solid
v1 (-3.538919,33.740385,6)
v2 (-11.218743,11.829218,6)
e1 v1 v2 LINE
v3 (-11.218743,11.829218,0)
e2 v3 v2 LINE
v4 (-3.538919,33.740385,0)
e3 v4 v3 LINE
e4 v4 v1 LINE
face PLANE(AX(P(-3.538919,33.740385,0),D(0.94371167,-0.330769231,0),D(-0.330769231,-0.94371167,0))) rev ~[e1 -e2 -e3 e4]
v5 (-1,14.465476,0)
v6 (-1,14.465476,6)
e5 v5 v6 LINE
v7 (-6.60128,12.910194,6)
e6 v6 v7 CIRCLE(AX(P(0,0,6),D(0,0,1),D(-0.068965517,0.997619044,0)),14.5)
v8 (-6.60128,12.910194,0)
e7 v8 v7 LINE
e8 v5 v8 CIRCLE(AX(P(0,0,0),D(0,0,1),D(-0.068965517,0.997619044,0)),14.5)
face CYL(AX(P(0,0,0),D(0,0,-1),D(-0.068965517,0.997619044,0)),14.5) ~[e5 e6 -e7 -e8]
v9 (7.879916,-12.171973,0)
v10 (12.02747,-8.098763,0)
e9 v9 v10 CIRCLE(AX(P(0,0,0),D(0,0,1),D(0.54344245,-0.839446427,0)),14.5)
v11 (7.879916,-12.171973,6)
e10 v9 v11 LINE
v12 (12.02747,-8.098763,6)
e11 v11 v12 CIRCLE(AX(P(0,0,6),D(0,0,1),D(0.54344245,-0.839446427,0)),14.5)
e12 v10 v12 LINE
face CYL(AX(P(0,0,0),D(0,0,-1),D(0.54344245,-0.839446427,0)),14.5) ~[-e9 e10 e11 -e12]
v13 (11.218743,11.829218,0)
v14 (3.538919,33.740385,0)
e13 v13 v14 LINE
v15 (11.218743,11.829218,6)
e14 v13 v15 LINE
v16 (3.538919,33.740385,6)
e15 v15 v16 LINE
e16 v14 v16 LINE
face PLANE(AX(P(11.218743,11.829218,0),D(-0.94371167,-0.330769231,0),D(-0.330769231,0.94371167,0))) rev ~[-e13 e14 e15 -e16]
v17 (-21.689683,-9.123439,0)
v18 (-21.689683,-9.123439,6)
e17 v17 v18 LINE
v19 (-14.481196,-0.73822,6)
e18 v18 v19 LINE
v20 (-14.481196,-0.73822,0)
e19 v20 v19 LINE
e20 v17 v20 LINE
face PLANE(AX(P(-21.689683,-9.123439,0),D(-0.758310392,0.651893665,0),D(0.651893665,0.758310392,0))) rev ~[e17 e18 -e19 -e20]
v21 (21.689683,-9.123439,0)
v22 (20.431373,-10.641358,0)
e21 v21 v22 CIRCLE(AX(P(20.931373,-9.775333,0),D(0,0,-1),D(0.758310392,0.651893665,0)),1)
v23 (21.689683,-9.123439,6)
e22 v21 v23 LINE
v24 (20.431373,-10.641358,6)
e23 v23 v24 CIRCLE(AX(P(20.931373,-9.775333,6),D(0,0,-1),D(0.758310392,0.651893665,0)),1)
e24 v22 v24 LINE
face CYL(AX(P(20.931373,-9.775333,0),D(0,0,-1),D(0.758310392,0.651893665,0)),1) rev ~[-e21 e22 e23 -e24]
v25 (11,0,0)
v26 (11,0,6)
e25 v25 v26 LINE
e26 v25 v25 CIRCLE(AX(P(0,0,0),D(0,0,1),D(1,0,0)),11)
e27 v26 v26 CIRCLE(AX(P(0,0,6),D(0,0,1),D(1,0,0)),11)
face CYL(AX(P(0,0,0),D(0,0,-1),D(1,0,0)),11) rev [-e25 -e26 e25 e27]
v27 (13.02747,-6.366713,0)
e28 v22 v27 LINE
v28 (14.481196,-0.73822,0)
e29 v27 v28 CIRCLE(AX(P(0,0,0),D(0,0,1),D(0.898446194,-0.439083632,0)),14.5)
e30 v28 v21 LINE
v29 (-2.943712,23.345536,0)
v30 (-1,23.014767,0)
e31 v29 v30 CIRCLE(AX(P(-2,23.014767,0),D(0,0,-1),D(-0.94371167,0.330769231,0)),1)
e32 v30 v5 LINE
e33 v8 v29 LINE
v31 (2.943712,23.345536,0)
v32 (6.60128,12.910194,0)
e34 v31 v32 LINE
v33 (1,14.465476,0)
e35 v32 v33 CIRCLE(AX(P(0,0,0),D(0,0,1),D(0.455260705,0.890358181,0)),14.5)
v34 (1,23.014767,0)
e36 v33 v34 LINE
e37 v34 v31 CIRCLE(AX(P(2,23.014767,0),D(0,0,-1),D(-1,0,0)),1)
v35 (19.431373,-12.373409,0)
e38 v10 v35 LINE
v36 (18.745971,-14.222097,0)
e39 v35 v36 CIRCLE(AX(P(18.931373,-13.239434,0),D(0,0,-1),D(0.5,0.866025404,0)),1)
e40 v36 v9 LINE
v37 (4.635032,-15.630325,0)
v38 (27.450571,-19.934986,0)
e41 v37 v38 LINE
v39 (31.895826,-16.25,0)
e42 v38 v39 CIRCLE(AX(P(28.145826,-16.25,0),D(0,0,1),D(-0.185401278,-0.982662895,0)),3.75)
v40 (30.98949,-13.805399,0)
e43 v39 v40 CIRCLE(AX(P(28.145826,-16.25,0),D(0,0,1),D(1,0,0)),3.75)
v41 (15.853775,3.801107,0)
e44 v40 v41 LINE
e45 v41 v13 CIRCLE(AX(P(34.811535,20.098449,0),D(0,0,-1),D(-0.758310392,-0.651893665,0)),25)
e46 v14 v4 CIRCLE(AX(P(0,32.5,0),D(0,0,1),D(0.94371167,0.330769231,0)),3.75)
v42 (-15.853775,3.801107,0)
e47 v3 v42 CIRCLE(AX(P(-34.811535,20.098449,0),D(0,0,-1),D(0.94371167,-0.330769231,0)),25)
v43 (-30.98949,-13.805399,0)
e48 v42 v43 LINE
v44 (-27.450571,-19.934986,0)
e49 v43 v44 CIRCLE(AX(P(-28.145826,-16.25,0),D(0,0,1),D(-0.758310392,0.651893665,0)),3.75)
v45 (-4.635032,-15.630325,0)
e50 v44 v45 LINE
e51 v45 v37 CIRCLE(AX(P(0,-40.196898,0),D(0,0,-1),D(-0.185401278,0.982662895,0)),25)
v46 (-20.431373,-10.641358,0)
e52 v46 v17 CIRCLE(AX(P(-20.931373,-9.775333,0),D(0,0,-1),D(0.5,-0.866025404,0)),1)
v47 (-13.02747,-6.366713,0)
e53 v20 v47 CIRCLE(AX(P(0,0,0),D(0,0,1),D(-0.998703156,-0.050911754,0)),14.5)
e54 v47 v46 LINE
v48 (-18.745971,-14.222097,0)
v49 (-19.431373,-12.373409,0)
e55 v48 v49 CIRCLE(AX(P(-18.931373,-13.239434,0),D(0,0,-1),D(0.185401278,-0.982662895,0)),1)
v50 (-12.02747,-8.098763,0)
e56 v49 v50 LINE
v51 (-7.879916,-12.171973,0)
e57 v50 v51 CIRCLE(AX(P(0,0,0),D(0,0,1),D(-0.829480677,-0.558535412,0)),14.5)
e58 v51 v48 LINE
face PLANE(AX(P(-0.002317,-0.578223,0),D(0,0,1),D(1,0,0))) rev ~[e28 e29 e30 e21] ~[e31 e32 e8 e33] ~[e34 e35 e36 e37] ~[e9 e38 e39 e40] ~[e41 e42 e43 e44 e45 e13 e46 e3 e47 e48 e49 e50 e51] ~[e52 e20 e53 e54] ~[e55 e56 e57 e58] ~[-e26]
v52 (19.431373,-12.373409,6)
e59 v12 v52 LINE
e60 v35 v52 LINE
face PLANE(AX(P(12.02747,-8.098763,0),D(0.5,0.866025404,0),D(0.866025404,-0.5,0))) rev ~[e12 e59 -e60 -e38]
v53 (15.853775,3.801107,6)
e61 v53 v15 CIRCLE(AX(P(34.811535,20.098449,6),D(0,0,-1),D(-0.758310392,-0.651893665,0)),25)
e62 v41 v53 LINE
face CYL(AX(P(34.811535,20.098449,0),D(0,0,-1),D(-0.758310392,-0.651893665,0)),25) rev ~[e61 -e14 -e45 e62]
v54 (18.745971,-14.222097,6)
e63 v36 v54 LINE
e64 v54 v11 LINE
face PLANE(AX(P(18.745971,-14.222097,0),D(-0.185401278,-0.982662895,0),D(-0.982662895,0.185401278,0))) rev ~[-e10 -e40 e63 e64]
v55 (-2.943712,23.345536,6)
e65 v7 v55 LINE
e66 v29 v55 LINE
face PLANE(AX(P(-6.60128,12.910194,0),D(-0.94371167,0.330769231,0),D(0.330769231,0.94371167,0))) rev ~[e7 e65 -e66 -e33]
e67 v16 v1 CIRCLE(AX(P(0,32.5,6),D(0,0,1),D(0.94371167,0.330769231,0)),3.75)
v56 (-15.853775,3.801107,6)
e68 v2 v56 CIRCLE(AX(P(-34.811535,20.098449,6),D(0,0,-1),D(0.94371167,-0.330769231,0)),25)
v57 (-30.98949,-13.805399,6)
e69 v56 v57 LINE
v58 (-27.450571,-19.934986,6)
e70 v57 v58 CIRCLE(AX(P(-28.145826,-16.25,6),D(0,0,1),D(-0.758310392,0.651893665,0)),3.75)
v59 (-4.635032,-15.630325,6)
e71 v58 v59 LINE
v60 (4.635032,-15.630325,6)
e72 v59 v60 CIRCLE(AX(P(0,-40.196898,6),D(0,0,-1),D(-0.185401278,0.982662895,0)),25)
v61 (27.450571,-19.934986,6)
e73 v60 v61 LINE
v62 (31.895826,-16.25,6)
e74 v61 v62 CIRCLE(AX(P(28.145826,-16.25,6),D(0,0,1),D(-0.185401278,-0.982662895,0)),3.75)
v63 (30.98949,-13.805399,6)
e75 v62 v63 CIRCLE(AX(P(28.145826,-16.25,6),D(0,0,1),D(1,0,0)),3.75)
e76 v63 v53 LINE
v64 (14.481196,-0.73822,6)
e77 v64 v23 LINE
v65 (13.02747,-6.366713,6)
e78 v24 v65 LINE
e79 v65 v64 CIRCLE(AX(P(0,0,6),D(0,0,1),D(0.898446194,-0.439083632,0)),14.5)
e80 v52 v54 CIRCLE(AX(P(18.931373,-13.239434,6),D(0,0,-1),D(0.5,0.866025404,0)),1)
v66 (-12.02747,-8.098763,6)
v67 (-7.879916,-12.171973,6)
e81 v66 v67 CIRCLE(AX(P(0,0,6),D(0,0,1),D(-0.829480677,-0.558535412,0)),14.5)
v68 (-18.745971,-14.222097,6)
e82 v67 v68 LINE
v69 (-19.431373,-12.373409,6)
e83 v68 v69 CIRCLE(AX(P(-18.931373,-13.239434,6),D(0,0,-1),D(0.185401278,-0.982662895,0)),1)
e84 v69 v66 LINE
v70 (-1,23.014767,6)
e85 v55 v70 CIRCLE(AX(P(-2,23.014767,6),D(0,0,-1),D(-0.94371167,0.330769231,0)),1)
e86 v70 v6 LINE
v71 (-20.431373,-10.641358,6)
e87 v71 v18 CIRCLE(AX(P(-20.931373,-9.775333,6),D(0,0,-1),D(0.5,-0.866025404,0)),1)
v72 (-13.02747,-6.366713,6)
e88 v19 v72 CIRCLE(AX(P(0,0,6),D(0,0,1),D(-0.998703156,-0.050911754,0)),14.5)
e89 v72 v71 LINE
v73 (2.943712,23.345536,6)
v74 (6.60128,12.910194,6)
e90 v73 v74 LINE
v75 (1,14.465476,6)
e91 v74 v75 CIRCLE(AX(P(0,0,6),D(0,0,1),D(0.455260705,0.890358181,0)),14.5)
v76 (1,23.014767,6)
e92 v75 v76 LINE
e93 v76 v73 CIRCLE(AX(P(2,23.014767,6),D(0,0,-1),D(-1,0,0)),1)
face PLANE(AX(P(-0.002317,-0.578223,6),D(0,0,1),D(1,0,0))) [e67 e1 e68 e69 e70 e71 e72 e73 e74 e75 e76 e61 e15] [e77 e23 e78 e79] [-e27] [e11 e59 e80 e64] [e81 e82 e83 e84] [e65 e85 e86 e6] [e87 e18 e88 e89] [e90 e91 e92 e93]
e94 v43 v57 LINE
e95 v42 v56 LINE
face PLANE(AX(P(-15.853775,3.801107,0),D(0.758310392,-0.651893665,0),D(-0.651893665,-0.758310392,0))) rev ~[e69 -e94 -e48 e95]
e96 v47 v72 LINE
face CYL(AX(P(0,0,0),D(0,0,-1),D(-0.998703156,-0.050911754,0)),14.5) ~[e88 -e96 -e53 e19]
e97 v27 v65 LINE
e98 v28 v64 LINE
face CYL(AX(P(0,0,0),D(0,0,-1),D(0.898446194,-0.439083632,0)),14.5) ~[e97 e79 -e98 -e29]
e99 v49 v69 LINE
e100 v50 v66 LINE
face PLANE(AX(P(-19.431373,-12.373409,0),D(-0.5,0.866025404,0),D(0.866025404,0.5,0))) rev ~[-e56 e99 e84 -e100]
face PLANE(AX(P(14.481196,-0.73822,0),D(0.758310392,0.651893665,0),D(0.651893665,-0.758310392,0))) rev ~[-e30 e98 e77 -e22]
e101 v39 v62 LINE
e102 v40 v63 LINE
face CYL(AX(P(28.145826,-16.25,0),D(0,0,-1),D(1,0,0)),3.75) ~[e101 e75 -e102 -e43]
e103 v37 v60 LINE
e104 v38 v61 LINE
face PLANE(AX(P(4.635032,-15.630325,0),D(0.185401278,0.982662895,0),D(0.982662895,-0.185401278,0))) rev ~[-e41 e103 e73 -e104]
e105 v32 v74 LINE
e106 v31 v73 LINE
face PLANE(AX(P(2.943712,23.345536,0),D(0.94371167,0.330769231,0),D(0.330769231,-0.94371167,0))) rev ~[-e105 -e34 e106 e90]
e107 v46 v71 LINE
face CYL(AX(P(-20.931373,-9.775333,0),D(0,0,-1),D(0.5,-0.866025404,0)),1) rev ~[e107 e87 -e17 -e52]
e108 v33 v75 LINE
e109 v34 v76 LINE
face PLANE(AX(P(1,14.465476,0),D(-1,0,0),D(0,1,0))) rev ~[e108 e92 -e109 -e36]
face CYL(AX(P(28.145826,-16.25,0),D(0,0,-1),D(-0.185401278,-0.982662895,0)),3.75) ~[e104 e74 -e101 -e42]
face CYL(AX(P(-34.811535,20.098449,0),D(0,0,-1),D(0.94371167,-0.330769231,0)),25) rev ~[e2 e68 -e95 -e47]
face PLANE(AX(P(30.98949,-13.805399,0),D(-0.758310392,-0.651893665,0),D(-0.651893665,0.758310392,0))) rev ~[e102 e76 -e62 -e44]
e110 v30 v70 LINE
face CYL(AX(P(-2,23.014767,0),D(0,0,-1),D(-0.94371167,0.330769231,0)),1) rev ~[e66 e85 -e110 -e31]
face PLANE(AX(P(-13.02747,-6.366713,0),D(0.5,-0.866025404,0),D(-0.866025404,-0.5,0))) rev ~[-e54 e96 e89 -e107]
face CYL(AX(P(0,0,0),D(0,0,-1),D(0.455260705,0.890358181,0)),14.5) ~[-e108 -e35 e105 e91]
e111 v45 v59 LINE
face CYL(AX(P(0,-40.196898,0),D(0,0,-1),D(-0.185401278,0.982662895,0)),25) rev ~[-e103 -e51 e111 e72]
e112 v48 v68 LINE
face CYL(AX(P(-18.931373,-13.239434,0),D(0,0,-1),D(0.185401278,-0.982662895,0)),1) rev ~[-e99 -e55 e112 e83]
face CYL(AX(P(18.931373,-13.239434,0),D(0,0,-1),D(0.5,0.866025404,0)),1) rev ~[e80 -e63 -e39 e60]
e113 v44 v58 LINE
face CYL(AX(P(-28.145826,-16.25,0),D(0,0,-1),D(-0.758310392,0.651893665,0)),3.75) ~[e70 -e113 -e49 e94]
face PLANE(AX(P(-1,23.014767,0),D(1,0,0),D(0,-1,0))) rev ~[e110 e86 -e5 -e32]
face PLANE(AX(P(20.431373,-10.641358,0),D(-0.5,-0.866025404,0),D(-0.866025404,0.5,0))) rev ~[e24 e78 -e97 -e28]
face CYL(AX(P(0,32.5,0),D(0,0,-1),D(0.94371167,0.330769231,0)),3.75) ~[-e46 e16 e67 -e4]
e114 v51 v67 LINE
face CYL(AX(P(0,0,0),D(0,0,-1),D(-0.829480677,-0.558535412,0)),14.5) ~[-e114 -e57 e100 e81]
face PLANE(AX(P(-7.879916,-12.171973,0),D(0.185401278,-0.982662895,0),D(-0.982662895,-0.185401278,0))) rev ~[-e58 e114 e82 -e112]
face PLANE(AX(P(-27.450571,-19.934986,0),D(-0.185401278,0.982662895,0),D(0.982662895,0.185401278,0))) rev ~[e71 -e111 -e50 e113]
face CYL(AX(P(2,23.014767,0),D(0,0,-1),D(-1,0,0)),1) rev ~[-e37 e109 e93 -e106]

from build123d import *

# Parameters (mm, degrees)
F0_R     = 11
F1_DEPTH = 6


with BuildPart() as f1:
    # F0 (on Top) → F1 (new body)
    with BuildSketch(Plane.XY):
        with BuildLine():
            Line((11.2187429189, 11.8292181419), (3.5389187623, 33.7403846154))
            ThreePointArc((3.5389187623, 33.7403846154), (0, 36.25), (-3.5389187623, 33.7403846154))
            Line((-3.5389187623, 33.7403846154), (-11.2187429189, 11.8292181419))
            ThreePointArc((-11.2187429189, 11.8292181419), (-13.1608995727, 7.5984489111), (-15.8537748772, 3.8011072954))
            Line((-15.8537748772, 3.8011072954), (-30.9894895915, -13.8053987576))
            ThreePointArc((-30.9894895915, -13.8053987576), (-28.3703151015, -12.5067254343), (-25.6147048476, -13.4830653025))
            ThreePointArc((-25.6147048476, -13.4830653025), (-24.8982303588, -14.375), (-24.4840294966, -15.4414524572))
            ThreePointArc((-24.4840294966, -15.4414524572), (-24.4179418082, -15.8433278187), (-24.395825623, -16.25))
            ThreePointArc((-24.395825623, -16.25), (-25.2588111204, -18.643250355), (-27.4505708292, -19.9349858577))
            Line((-27.4505708292, -19.9349858577), (-4.6350319583, -15.6303254372))
            ThreePointArc((-4.6350319583, -15.6303254372), (0, -15.1968978222), (4.6350319583, -15.6303254372))
            Line((4.6350319583, -15.6303254372), (27.4505708292, -19.9349858577))
            ThreePointArc((27.4505708292, -19.9349858577), (25.016299495, -18.3160508741), (24.4840294966, -15.4414524572))
            ThreePointArc((24.4840294966, -15.4414524572), (24.8982303588, -14.375), (25.6147048476, -13.4830653025))
            ThreePointArc((25.6147048476, -13.4830653025), (28.3703151015, -12.5067254343), (30.9894895915, -13.8053987576))
            Line((30.9894895915, -13.8053987576), (15.8537748772, 3.8011072954))
            ThreePointArc((15.8537748772, 3.8011072954), (13.1608995727, 7.5984489111), (11.2187429189, 11.8292181419))
        make_face()
        with BuildLine():
            Line((-19.4313725784, -12.3734087272), (-12.0274698164, -8.0987634745))
            ThreePointArc((-12.0274698164, -8.0987634745), (-10.1599093098, -10.3453488494), (-7.8799155315, -12.171973185))
            Line((-7.8799155315, -12.171973185), (-18.7459713, -14.2220970264))
            ThreePointArc((-18.7459713, -14.2220970264), (-19.8690053401, -13.5870615238), (-19.4313725784, -12.3734087272))
        make_face(mode=Mode.SUBTRACT)
        with BuildLine():
            ThreePointArc((-20.4313725784, -10.6413579197), (-21.7012431124, -10.4135326105), (-21.68968297, -9.1234388512))
            Line((-21.68968297, -9.1234388512), (-14.4811957581, -0.7382204374))
            ThreePointArc((-14.4811957581, -0.7382204374), (-14.0392895695, -3.6260651377), (-13.0274698164, -6.366712667))
            Line((-13.0274698164, -6.366712667), (-20.4313725784, -10.6413579197))
        make_face(mode=Mode.SUBTRACT)
        with BuildLine():
            ThreePointArc((19.4313725784, -12.3734087272), (19.8690053401, -13.5870615238), (18.7459713, -14.2220970264))
            Line((18.7459713, -14.2220970264), (7.8799155315, -12.171973185))
            ThreePointArc((7.8799155315, -12.171973185), (10.1599093098, -10.3453488494), (12.0274698164, -8.0987634745))
            Line((12.0274698164, -8.0987634745), (19.4313725784, -12.3734087272))
        make_face(mode=Mode.SUBTRACT)
        Circle(F0_R, mode=Mode.SUBTRACT)
        with BuildLine():
            Line((14.4811957581, -0.7382204374), (21.68968297, -9.1234388512))
            ThreePointArc((21.68968297, -9.1234388512), (21.7012431124, -10.4135326105), (20.4313725784, -10.6413579197))
            Line((20.4313725784, -10.6413579197), (13.0274698164, -6.366712667))
            ThreePointArc((13.0274698164, -6.366712667), (14.0392895695, -3.6260651377), (14.4811957581, -0.7382204374))
        make_face(mode=Mode.SUBTRACT)
        with BuildLine():
            Line((-6.6012802267, 12.9101936225), (-2.9437116699, 23.3455358777))
            ThreePointArc((-2.9437116699, 23.3455358777), (-1.8322377723, 24.0005941343), (-1, 23.0147666469))
            Line((-1, 23.0147666469), (-1, 14.4654761415))
            ThreePointArc((-1, 14.4654761415), (-3.8793802597, 13.9714139872), (-6.6012802267, 12.9101936225))
        make_face(mode=Mode.SUBTRACT)
        with BuildLine():
            ThreePointArc((1, 23.0147666469), (1.8322377723, 24.0005941343), (2.9437116699, 23.3455358777))
            Line((2.9437116699, 23.3455358777), (6.6012802267, 12.9101936225))
            ThreePointArc((6.6012802267, 12.9101936225), (3.8793802597, 13.9714139872), (1, 14.4654761415))
            Line((1, 14.4654761415), (1, 23.0147666469))
        make_face(mode=Mode.SUBTRACT)
        with BuildLine():
            ThreePointArc((-25.6147048476, -13.4830653025), (-28.3703151015, -12.5067254343), (-30.9894895915, -13.8053987576))
            ThreePointArc((-30.9894895915, -13.8053987576), (-31.3934208872, -18.125), (-27.4505708292, -19.9349858577))
            ThreePointArc((-27.4505708292, -19.9349858577), (-25.2588111204, -18.643250355), (-24.395825623, -16.25))
            ThreePointArc((-24.395825623, -16.25), (-24.4179418082, -15.8433278187), (-24.4840294966, -15.4414524572))
            ThreePointArc((-24.4840294966, -15.4414524572), (-24.8982303588, -14.375), (-25.6147048476, -13.4830653025))
        make_face()
        with BuildLine():
            ThreePointArc((31.895825623, -16.25), (31.6619484793, -14.9463972771), (30.9894895915, -13.8053987576))
            ThreePointArc((30.9894895915, -13.8053987576), (28.3703151015, -12.5067254343), (25.6147048476, -13.4830653025))
            ThreePointArc((25.6147048476, -13.4830653025), (24.8982303588, -14.375), (24.4840294966, -15.4414524572))
            ThreePointArc((24.4840294966, -15.4414524572), (25.016299495, -18.3160508741), (27.4505708292, -19.9349858577))
            ThreePointArc((27.4505708292, -19.9349858577), (30.539075978, -19.1370145026), (31.895825623, -16.25))
        make_face()
    extrude(amount=F1_DEPTH)


solid = f1.part
